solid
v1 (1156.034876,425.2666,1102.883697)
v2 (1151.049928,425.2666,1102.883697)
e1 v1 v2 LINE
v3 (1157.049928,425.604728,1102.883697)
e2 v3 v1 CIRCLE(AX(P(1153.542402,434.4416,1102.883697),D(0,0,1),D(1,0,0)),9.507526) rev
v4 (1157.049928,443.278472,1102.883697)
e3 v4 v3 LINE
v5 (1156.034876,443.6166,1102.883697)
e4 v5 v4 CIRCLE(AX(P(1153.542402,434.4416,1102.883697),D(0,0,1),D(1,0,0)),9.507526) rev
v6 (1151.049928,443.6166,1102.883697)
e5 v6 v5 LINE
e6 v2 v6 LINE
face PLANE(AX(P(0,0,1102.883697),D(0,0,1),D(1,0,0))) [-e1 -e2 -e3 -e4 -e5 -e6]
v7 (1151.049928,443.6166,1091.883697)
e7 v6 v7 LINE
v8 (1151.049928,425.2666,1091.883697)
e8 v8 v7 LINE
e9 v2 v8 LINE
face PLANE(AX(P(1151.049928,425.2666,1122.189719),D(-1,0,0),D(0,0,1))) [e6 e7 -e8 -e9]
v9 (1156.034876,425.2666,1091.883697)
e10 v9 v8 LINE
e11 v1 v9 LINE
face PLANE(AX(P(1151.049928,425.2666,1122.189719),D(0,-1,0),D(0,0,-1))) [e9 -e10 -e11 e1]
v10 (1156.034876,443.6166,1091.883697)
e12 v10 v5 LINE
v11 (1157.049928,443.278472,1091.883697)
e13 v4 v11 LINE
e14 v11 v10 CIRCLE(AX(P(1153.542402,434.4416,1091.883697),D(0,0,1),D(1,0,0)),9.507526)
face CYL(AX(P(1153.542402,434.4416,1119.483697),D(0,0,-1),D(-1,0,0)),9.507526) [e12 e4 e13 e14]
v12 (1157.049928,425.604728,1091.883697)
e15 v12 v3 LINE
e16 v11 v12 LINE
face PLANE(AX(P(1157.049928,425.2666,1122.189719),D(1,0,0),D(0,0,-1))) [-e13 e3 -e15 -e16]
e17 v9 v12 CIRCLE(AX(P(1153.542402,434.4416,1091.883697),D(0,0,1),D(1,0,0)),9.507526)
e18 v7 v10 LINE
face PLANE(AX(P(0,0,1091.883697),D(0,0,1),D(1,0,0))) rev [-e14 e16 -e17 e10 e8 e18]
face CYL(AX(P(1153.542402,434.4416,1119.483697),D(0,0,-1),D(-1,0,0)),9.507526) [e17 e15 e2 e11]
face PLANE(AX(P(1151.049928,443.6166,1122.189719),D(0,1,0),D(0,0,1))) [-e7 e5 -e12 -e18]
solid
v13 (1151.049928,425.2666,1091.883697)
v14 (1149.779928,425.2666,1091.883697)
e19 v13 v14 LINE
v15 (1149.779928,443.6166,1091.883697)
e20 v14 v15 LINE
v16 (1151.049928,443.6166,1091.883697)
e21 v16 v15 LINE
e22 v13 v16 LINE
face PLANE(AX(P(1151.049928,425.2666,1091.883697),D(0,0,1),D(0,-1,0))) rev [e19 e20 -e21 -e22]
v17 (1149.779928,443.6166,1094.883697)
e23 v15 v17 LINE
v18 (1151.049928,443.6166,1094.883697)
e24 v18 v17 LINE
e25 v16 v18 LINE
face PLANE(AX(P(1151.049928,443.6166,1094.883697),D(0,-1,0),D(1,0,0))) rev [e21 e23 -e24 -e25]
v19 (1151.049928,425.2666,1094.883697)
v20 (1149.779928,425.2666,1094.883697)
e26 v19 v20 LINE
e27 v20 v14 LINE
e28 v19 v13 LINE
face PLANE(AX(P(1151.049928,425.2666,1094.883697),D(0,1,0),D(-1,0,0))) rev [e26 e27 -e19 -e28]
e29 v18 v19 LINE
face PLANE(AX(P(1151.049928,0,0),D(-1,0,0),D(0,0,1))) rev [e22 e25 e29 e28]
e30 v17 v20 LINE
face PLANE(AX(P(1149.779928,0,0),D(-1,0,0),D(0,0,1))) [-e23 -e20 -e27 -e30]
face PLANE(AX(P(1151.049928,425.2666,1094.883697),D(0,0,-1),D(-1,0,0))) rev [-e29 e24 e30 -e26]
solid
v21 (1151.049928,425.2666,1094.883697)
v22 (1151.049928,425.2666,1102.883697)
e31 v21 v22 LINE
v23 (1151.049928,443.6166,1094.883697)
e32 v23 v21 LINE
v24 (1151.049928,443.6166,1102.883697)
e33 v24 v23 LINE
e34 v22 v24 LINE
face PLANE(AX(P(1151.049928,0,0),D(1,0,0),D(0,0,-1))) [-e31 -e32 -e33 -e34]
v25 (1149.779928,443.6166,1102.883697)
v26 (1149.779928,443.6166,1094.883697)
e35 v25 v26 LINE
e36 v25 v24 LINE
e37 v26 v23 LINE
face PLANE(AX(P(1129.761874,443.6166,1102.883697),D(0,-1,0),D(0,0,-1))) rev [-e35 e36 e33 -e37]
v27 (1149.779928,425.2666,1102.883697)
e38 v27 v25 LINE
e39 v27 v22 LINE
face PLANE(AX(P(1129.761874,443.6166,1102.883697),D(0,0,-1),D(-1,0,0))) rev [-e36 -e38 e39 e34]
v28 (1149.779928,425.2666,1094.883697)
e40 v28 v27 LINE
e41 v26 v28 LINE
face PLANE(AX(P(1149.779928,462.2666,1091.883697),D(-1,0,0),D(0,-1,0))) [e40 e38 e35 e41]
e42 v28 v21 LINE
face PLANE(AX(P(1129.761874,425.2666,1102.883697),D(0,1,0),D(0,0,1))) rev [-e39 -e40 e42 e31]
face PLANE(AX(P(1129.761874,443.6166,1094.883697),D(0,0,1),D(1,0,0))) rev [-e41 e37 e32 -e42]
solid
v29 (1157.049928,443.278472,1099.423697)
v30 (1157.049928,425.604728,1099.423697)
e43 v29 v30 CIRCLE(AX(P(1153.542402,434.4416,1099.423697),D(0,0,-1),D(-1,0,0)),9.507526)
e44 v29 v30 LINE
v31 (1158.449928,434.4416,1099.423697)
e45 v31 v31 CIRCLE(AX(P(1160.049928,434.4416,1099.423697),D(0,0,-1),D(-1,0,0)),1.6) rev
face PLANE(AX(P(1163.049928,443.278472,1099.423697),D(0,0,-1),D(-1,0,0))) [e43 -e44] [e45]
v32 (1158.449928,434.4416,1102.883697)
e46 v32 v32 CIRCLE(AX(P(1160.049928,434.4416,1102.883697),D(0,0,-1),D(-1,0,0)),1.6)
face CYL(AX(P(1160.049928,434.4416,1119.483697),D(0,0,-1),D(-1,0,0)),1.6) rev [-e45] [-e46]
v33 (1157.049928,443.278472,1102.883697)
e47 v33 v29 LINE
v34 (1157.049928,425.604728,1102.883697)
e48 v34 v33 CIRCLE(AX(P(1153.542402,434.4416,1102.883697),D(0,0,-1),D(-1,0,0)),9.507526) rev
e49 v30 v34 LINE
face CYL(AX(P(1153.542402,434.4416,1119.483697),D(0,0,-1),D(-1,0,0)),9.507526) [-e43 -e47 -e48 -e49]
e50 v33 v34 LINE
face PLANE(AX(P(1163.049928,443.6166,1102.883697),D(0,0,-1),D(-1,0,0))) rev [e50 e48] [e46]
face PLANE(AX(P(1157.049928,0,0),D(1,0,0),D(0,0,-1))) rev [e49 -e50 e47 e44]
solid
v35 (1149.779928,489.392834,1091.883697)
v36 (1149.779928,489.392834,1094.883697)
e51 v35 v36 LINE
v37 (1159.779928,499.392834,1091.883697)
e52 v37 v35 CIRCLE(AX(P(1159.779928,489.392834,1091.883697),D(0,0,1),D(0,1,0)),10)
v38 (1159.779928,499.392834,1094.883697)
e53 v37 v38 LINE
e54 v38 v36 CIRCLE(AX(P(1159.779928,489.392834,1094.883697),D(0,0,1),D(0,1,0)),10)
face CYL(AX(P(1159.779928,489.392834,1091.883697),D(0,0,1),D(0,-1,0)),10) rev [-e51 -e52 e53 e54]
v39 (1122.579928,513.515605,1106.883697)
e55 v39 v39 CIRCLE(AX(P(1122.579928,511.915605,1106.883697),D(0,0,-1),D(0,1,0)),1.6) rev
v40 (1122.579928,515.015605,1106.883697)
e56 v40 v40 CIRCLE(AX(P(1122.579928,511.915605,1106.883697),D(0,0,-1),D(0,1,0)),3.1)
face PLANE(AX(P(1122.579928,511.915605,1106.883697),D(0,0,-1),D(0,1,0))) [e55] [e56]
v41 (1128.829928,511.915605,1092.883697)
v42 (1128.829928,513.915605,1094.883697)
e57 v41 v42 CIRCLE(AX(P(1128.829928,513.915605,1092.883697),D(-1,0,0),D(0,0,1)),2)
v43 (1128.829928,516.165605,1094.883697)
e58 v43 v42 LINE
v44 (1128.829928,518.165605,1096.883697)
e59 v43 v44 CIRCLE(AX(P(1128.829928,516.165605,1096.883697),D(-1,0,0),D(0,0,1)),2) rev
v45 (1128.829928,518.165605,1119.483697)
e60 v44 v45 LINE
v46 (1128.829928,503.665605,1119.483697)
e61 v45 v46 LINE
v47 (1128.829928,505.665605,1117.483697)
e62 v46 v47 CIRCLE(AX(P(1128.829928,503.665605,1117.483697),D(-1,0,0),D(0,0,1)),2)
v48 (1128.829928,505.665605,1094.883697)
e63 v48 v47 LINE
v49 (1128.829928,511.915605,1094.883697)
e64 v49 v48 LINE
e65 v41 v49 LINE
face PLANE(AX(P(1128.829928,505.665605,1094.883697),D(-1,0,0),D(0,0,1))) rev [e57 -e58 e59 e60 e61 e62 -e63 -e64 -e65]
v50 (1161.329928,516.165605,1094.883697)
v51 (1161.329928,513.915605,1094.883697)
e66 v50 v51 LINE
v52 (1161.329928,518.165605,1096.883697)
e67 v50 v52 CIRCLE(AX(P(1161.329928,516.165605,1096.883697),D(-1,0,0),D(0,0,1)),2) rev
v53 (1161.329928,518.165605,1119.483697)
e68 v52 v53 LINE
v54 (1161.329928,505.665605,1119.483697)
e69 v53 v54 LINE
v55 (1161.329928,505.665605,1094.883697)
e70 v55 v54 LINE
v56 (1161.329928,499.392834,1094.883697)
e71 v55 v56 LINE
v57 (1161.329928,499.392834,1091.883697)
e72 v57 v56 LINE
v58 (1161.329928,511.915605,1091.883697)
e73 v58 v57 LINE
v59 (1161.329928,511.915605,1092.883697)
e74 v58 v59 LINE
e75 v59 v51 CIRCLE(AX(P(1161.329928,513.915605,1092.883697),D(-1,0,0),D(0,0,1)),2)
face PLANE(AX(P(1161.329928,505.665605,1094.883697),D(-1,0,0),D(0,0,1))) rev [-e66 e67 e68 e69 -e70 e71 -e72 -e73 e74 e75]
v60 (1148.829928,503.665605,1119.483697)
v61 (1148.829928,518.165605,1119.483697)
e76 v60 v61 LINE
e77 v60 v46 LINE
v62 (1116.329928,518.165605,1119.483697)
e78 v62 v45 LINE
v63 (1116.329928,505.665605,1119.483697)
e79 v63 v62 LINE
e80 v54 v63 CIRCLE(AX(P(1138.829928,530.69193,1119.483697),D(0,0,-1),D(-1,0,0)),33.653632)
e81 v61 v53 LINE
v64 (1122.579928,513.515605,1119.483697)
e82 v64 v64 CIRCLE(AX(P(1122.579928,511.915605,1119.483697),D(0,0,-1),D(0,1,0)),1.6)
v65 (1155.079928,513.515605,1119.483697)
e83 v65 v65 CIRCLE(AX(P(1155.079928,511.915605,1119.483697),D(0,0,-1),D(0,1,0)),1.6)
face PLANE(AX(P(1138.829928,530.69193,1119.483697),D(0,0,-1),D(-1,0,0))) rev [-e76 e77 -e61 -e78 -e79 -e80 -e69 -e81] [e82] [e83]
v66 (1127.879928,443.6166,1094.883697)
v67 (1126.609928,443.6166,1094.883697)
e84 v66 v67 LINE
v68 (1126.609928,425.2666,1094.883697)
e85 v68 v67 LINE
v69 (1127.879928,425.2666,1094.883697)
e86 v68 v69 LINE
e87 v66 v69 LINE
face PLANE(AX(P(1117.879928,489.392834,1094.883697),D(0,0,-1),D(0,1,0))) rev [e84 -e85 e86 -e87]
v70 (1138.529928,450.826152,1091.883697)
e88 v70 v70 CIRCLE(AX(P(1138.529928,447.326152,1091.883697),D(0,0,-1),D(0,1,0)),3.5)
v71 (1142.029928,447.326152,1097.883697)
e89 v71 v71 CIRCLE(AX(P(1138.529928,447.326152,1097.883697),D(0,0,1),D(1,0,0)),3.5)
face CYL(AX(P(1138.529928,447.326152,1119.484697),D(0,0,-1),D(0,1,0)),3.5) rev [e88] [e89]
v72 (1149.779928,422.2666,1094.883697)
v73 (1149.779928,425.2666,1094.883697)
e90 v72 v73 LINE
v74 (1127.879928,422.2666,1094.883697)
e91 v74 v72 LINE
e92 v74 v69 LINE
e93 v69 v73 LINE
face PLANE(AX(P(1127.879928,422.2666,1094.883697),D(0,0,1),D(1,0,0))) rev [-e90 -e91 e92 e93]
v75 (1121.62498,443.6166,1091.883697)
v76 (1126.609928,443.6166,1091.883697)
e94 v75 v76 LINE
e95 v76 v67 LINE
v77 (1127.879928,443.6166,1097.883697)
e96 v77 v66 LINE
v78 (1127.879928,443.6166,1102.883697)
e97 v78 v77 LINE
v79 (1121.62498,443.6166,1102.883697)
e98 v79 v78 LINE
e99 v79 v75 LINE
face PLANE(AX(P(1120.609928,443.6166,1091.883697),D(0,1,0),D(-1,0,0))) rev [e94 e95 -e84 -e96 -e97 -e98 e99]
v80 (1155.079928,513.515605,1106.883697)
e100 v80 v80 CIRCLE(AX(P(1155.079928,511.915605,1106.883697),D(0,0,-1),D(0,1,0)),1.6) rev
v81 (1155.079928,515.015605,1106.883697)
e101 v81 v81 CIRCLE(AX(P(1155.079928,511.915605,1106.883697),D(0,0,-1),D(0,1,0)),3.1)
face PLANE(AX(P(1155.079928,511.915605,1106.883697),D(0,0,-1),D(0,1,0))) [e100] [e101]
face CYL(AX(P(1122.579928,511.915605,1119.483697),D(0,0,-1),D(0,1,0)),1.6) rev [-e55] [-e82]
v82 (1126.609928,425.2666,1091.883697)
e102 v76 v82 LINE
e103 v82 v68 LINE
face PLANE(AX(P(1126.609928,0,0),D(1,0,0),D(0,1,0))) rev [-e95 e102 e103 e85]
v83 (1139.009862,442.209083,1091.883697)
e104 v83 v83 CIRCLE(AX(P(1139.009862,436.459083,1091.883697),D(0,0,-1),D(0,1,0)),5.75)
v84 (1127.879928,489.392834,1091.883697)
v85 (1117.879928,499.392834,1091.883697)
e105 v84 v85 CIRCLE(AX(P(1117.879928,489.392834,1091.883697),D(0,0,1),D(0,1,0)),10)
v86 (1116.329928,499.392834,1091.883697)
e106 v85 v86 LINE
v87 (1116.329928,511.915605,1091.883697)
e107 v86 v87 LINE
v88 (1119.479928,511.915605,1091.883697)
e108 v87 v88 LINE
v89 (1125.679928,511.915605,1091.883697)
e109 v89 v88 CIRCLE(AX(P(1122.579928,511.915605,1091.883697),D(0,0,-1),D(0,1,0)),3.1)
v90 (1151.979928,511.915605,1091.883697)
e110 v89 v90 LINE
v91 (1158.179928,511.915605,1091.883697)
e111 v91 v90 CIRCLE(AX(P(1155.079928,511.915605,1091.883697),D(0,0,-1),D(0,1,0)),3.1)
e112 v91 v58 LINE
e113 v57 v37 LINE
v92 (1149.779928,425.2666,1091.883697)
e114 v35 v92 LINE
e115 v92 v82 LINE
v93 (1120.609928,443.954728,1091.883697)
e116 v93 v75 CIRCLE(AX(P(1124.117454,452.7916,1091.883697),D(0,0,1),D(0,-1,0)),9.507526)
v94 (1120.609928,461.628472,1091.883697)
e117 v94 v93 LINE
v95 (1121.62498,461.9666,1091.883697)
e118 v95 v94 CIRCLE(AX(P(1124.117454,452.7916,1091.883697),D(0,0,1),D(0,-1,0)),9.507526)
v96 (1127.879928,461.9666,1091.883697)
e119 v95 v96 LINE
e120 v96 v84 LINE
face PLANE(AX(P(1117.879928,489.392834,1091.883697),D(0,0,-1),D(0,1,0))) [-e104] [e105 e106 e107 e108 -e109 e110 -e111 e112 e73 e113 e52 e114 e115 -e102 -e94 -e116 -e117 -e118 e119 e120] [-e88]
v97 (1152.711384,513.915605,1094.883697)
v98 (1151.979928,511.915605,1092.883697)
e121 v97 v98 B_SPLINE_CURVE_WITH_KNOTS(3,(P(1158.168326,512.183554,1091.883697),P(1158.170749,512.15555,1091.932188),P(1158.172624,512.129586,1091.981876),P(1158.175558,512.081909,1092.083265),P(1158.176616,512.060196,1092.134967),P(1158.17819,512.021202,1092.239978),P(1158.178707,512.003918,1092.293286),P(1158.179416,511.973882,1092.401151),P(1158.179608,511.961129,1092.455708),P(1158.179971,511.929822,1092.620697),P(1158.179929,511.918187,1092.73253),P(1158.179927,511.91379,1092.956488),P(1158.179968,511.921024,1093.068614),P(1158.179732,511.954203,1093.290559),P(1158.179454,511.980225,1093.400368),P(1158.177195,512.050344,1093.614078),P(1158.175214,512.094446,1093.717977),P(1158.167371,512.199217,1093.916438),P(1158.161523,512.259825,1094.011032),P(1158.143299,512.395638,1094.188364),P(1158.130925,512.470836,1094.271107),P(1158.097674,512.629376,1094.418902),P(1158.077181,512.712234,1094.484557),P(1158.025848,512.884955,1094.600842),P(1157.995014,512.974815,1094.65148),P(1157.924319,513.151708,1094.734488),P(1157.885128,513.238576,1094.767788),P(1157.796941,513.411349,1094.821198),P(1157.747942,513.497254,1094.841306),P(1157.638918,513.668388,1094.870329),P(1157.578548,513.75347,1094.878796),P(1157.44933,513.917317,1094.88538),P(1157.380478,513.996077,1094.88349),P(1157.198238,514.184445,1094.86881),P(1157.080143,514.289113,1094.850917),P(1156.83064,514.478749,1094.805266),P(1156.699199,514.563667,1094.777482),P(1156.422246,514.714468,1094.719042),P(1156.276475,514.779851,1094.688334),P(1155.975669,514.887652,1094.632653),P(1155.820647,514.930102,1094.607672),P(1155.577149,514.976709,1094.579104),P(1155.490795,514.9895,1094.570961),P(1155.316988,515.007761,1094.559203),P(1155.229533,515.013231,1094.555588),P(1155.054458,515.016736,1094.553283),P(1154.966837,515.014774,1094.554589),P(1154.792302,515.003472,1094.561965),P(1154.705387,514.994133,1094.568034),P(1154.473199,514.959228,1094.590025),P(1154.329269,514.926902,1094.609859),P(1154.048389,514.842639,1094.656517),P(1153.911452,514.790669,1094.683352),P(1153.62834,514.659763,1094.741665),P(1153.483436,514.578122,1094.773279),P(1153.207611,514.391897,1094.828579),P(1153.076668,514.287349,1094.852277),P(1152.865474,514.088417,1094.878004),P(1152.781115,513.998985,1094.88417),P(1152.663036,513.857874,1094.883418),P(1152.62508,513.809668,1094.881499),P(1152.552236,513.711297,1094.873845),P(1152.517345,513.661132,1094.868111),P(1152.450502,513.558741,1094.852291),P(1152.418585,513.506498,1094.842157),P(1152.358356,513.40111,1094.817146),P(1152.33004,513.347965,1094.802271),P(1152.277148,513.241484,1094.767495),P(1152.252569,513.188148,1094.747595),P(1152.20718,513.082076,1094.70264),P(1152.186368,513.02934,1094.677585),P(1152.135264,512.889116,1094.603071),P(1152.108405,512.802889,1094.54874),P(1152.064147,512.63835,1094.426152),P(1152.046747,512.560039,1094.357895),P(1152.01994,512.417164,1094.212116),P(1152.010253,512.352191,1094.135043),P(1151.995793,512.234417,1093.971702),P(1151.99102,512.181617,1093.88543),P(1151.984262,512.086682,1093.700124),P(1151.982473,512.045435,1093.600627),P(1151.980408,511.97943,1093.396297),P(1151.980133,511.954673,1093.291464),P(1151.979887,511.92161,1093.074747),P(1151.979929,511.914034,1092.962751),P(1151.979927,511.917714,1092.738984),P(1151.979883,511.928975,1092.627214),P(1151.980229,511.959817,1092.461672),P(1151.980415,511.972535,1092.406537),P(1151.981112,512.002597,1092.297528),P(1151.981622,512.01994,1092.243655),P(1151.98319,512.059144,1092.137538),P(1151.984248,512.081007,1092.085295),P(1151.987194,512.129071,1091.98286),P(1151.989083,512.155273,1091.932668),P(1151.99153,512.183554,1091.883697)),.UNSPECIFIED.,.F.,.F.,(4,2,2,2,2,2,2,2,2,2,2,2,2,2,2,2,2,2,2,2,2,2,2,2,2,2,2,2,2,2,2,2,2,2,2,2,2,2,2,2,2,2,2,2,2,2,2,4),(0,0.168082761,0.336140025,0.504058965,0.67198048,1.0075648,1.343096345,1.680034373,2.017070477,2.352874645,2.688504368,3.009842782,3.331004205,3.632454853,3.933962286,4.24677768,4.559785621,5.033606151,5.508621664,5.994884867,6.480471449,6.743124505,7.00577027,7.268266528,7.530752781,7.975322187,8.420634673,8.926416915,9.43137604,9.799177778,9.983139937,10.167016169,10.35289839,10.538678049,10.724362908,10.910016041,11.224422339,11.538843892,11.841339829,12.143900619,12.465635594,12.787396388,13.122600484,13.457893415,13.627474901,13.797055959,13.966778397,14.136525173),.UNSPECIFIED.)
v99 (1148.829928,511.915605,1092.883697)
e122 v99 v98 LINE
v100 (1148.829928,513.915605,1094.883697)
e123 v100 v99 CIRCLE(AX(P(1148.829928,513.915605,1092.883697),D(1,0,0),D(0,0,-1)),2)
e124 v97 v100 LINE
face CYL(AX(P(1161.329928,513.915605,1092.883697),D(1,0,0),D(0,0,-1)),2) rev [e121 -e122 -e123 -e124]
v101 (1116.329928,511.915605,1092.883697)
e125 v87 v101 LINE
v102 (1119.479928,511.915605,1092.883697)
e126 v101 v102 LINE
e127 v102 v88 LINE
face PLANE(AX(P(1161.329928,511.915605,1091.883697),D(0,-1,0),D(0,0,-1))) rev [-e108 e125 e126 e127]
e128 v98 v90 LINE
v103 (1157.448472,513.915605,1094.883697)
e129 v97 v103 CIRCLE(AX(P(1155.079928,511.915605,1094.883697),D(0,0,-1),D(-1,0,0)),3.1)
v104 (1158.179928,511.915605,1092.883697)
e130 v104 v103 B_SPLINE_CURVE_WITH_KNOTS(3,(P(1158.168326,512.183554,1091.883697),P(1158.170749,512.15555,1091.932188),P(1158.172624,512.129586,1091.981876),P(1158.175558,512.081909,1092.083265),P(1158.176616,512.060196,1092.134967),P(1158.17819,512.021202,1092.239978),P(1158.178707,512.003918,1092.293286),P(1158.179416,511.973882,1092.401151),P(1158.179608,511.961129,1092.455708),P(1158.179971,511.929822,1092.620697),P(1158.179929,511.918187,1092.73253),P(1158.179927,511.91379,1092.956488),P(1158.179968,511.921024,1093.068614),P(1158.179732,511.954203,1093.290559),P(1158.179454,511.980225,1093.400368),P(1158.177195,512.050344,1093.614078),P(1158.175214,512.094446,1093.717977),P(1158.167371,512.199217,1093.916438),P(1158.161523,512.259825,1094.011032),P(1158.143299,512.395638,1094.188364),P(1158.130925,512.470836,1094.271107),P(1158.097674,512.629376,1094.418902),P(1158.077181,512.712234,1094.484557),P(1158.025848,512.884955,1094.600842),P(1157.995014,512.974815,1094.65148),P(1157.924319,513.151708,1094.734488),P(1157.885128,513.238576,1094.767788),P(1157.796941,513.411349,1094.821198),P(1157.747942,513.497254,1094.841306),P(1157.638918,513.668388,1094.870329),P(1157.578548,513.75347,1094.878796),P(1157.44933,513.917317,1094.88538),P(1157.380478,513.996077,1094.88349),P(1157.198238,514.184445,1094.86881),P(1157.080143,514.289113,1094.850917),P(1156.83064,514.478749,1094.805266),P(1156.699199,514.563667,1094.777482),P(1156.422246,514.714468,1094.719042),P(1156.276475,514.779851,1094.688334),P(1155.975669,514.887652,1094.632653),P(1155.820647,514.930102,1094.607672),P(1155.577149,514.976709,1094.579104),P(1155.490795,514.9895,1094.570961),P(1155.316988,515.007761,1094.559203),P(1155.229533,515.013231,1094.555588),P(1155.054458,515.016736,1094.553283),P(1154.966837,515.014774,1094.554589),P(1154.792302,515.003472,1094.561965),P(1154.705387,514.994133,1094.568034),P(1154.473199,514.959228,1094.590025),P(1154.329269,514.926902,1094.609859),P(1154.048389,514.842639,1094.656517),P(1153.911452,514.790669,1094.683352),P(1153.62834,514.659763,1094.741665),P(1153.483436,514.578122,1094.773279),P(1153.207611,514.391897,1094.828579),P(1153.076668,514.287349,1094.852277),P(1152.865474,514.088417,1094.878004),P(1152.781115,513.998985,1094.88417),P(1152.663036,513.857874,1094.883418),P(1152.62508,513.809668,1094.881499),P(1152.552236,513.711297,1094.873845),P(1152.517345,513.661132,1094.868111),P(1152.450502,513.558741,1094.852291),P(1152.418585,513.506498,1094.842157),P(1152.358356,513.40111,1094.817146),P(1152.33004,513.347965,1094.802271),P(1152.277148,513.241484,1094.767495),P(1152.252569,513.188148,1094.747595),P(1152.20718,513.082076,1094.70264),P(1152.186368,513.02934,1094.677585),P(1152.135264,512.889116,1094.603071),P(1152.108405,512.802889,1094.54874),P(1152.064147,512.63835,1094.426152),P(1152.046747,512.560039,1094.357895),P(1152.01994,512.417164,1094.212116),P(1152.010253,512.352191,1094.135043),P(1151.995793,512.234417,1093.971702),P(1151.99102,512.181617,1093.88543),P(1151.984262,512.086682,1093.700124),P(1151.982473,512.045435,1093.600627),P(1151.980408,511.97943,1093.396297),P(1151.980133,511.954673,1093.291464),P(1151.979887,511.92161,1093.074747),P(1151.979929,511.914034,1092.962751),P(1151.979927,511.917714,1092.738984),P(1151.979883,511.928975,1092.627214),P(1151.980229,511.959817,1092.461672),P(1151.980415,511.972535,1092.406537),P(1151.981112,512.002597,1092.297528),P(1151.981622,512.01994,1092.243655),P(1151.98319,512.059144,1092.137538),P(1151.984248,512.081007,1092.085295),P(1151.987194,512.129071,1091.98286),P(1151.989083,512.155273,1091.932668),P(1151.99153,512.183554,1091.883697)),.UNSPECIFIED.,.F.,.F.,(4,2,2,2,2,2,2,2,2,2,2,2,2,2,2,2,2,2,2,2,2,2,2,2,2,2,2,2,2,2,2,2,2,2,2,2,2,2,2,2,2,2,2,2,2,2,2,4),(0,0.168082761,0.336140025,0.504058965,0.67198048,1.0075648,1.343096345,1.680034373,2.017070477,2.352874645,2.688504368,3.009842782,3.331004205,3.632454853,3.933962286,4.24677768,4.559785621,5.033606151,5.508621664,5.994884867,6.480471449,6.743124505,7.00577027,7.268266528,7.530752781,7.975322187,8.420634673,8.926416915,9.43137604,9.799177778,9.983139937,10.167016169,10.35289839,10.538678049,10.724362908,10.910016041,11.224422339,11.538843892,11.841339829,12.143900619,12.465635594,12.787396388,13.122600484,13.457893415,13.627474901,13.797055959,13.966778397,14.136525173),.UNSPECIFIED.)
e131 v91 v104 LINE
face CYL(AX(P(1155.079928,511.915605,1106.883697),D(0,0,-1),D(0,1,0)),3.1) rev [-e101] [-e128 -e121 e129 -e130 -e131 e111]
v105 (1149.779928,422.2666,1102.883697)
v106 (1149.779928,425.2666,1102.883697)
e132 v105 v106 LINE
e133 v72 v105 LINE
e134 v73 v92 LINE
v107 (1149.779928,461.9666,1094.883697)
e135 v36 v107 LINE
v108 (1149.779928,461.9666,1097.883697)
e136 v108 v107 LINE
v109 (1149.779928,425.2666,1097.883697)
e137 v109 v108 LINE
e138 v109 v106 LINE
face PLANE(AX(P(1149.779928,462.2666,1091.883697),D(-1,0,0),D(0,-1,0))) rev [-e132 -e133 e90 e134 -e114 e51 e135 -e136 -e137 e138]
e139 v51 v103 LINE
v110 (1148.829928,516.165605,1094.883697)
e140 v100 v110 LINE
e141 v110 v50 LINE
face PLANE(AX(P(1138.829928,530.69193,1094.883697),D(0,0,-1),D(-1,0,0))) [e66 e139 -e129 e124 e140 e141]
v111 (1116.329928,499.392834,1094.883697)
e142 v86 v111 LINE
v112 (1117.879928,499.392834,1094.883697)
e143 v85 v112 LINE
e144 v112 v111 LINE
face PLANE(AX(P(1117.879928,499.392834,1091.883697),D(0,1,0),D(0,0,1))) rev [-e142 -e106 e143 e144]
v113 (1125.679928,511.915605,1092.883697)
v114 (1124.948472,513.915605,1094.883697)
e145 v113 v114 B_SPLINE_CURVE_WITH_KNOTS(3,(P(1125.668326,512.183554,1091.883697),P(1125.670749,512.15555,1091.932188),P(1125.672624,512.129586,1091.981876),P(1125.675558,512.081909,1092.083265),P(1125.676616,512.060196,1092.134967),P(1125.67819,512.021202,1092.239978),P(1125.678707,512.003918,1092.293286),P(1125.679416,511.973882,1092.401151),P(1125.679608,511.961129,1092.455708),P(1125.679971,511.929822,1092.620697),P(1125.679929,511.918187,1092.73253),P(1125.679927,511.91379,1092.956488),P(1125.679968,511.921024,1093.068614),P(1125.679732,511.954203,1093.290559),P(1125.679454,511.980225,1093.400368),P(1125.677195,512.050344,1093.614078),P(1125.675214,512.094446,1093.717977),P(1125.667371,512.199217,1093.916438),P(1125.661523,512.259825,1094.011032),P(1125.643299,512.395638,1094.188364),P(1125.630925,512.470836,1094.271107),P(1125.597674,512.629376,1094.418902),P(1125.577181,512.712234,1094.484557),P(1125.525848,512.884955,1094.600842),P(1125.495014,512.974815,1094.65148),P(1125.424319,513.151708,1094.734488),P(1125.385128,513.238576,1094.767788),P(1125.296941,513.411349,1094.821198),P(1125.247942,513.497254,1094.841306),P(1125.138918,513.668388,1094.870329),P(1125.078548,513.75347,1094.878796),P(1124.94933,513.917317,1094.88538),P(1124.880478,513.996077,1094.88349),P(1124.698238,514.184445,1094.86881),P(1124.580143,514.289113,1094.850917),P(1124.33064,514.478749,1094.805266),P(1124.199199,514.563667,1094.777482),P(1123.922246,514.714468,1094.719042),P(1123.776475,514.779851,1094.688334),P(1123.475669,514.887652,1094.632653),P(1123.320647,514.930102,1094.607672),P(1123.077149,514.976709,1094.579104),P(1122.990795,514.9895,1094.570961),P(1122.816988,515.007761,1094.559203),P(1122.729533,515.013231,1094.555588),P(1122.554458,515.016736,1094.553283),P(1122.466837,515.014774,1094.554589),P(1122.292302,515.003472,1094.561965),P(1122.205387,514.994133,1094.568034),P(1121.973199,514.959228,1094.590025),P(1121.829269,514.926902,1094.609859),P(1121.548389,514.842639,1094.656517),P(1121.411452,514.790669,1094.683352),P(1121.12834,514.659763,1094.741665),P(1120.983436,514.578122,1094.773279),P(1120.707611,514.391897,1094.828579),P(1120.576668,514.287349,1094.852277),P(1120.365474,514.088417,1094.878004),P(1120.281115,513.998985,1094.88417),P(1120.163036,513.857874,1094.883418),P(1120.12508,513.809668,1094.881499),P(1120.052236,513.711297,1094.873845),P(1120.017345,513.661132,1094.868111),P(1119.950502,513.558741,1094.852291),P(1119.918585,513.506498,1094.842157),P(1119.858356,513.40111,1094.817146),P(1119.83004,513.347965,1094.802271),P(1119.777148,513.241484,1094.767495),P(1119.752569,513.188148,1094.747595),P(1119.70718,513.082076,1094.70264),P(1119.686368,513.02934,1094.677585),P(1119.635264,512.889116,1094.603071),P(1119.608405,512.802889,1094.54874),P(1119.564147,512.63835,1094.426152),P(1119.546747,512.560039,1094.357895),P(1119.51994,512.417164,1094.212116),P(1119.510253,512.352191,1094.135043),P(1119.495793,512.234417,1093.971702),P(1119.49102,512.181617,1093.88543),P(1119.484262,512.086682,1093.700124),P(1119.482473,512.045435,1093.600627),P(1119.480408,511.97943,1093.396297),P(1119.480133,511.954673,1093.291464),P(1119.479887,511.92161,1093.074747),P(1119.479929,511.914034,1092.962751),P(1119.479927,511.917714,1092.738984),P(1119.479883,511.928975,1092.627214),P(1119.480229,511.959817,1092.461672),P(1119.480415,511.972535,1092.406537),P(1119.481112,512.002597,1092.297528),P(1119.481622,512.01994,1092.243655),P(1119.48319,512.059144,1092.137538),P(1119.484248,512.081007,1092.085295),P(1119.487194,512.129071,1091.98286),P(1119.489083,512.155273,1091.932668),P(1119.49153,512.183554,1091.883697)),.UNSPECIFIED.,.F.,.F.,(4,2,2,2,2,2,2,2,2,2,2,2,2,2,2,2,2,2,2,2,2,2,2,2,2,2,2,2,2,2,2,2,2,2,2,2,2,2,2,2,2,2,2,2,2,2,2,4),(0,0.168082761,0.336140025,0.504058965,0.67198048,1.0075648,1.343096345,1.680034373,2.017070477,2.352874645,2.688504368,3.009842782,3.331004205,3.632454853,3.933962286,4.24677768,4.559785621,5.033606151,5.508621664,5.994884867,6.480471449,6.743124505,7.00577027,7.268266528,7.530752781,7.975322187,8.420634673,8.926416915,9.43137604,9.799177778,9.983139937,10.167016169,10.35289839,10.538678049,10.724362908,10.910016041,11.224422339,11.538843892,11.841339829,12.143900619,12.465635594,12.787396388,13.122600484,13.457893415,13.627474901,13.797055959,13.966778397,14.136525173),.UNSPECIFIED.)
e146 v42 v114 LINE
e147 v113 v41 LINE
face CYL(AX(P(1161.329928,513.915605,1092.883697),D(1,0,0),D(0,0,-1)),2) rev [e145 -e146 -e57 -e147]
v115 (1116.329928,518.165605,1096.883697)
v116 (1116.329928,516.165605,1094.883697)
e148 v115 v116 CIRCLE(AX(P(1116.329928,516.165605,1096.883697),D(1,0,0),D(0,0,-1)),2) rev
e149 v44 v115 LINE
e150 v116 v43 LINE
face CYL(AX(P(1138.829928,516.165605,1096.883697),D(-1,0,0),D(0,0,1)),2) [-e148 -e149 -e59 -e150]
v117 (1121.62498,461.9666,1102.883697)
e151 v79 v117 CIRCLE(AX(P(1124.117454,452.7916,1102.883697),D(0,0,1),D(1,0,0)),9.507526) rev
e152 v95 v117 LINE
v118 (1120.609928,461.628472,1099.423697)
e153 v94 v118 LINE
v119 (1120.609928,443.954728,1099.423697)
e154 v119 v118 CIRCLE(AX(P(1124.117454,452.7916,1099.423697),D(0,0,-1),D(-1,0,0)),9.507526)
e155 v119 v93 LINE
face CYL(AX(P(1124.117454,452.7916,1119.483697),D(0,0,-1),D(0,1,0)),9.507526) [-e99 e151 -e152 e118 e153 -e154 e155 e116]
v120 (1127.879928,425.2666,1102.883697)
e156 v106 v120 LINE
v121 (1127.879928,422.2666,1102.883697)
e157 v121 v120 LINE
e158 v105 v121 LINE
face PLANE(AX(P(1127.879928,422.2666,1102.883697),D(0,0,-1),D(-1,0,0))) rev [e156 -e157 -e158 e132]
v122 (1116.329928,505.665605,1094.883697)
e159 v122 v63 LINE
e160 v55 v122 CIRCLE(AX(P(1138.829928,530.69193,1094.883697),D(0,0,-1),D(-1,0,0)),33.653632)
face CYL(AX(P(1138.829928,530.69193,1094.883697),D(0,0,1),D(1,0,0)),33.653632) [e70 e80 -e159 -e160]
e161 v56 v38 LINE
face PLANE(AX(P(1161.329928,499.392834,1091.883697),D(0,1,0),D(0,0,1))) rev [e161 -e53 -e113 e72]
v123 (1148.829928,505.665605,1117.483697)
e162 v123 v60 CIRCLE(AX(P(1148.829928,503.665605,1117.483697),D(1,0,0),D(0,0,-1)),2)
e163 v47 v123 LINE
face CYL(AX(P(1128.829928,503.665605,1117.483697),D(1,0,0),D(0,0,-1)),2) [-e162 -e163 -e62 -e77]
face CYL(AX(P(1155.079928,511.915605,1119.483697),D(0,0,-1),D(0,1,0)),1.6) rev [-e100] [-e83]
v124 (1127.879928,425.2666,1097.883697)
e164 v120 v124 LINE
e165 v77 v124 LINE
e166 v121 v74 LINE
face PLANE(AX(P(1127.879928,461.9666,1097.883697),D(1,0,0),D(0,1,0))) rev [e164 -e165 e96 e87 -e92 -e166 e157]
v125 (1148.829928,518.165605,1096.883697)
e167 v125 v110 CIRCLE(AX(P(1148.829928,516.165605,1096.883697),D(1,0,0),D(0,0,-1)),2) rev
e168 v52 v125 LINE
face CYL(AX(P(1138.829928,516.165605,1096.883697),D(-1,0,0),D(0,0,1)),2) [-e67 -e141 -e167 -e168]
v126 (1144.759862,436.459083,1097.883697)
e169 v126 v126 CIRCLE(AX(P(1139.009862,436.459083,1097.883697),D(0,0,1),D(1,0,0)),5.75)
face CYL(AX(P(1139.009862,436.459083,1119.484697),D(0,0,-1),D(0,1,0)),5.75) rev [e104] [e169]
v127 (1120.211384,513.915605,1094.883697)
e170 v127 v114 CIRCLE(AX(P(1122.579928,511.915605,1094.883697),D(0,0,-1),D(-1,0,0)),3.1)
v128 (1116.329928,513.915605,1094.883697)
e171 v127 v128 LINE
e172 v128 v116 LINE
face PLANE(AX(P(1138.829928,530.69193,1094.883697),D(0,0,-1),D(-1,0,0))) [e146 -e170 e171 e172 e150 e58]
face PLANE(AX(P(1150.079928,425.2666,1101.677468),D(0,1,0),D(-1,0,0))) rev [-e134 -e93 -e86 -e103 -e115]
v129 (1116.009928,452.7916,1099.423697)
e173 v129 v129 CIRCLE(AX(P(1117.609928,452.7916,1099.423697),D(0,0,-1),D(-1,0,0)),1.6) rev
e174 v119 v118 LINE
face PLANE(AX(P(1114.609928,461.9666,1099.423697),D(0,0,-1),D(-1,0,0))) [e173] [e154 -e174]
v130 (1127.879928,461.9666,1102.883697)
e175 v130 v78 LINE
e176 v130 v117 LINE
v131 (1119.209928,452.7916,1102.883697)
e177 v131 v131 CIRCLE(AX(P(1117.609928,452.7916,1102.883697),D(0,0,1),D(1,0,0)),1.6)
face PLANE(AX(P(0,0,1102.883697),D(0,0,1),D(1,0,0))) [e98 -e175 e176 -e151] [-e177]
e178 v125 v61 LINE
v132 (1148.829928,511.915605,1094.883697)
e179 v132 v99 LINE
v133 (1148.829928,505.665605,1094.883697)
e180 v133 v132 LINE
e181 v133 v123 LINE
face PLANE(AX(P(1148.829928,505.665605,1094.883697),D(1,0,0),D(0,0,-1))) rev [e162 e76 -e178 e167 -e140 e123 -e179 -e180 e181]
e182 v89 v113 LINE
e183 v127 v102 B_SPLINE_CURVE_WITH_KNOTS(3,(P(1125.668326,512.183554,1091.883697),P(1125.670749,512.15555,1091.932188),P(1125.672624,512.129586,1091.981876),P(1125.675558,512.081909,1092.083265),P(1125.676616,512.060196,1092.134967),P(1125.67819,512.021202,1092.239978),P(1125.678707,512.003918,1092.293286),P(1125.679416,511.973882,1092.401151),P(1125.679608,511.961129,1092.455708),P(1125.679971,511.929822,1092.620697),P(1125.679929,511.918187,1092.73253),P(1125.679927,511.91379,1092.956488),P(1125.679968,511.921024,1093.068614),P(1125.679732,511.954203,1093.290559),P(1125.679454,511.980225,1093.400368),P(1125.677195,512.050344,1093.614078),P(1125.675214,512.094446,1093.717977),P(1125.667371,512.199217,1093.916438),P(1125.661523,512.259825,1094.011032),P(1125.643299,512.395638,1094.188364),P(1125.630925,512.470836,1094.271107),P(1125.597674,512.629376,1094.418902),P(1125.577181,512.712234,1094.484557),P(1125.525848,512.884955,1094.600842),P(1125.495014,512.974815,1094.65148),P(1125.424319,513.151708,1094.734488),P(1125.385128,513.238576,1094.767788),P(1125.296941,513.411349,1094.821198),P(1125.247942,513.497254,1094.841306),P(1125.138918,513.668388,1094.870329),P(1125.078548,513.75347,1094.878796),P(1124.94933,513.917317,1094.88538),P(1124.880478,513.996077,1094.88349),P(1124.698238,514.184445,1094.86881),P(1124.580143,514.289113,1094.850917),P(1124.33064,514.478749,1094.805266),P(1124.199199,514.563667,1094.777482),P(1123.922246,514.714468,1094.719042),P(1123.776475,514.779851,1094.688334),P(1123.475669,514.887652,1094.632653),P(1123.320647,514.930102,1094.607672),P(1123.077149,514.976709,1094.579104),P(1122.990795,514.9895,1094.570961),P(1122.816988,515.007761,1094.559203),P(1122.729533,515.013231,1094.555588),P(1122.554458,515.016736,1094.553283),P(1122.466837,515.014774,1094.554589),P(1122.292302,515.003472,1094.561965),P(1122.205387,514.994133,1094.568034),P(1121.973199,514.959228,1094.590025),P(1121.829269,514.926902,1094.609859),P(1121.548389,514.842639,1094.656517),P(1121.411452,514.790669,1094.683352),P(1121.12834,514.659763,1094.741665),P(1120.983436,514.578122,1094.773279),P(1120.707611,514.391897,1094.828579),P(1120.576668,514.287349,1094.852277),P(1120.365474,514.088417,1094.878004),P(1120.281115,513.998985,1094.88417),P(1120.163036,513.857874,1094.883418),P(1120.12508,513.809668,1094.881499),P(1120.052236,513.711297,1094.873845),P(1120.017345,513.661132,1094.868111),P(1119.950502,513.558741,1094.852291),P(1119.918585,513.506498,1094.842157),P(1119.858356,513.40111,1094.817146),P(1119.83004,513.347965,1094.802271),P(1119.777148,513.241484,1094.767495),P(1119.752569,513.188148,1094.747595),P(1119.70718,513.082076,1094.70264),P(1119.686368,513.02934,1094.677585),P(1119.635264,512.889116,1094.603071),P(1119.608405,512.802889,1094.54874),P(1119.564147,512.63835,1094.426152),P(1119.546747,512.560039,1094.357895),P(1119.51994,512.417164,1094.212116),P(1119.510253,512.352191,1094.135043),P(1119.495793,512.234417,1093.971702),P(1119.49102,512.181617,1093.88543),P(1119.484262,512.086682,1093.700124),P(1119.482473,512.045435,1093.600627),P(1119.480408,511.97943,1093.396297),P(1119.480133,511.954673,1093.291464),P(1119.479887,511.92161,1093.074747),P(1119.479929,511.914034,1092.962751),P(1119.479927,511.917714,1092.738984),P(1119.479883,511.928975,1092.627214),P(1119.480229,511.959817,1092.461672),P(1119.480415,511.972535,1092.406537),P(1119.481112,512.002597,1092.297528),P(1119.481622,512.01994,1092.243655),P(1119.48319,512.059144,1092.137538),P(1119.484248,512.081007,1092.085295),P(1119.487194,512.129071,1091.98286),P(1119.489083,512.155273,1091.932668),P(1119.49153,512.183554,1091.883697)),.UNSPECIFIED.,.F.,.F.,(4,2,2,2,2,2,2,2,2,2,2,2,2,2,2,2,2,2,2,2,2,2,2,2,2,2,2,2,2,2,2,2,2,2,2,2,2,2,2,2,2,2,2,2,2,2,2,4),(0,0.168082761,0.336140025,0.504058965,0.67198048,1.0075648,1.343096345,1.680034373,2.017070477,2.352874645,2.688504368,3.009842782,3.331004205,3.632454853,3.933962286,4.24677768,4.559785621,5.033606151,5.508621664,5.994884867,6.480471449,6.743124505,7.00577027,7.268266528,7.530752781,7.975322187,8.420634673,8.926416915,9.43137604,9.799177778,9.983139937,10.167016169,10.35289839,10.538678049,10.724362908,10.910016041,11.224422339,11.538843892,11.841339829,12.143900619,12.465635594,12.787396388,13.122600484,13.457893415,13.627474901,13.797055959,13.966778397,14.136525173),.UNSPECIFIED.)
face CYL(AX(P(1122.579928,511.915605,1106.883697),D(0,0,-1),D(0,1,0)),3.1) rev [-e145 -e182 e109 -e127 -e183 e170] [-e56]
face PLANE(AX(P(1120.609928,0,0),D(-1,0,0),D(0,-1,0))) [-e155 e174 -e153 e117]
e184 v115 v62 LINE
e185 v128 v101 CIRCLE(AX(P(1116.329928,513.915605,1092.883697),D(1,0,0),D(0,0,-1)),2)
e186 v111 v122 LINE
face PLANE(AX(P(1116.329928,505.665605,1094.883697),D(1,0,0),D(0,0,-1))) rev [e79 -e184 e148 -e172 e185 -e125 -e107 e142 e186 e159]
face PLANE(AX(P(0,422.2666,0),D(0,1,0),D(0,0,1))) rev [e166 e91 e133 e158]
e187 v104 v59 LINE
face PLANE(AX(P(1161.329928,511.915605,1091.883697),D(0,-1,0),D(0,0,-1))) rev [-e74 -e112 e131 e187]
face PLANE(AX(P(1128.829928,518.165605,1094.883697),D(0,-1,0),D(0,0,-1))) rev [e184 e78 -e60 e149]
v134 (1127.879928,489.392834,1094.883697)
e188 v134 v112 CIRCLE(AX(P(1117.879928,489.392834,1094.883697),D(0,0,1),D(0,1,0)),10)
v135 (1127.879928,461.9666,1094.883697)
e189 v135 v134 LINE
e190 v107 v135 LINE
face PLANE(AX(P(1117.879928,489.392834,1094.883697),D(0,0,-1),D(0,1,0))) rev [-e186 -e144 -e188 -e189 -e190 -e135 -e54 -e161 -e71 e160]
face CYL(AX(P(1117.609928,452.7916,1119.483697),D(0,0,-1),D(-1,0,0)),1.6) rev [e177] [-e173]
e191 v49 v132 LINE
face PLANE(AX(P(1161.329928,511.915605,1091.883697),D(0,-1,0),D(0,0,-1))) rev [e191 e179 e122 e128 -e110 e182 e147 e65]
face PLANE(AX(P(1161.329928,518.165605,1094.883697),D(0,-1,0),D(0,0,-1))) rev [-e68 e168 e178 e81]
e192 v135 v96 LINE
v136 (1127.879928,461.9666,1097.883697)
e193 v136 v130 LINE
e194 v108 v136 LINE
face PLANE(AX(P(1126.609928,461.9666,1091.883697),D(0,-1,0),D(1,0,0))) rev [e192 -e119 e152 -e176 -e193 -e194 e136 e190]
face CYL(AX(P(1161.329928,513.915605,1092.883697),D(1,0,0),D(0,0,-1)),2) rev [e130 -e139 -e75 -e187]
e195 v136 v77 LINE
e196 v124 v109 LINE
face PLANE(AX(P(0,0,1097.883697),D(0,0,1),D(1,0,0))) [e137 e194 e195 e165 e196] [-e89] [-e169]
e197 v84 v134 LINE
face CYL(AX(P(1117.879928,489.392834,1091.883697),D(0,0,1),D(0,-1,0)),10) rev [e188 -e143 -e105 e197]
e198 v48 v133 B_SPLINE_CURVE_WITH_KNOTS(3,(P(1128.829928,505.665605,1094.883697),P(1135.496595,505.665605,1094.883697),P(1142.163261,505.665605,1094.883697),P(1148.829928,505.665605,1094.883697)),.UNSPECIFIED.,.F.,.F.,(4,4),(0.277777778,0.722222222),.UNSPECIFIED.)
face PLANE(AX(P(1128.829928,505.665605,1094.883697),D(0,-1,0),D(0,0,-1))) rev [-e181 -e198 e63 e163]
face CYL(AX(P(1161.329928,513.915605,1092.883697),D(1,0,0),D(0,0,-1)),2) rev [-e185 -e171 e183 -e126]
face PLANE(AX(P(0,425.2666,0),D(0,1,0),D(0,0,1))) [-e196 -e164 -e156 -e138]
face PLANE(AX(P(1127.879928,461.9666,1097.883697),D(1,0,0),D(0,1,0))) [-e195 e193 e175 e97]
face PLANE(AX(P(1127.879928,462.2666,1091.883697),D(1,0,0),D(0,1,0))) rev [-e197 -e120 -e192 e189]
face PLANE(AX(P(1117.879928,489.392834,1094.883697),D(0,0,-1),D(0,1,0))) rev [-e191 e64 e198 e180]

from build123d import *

# Parameters (mm, degrees)
BOSS_EXTRUDE1_DEPTH     = 24.6
BOSS_EXTRUDE2_DEPTH     = 3
SKETCH5_W               = 21.9
SKETCH5_H               = 3
BOSS_EXTRUDE3_DEPTH     = 37
CUT_EXTRUDE1_REACH      = 1273.984
SKETCH7_R               = 5.75
SKETCH8_W               = 3
SKETCH8_H               = 36.7
BOSS_EXTRUDE4_DEPTH     = 1.27
SKETCH9_W               = 3
SKETCH9_H               = 18.35
BOSS_EXTRUDE5_DEPTH     = 6
SKETCH11_W              = 6
SKETCH11_H              = 18.35
BOSS_EXTRUDE6_DEPTH     = 8
SKETCH12_W              = 6
SKETCH12_H              = 18.35
BOSS_EXTRUDE7_DEPTH     = 6
SKETCH14_R              = 1.6
CUT_EXTRUDE2_DEPTH      = 1272.885826469
CUT_EXTRUDE3_DEPTH      = 1272.984495021
SKETCH17_R              = 1.6
CUT_EXTRUDE4_DEPTH      = 1272.984495021
FILLET5_R               = 2
SKETCH18_R              = 3.1
CUT_EXTRUDE5_DEPTH      = 15
FILLET8_R               = 2
SKETCH19_W              = 3
SKETCH19_H              = 18.35
BOSS_EXTRUDE9_DEPTH     = 1.27
SKETCH20_W              = 6
SKETCH20_H              = 18.35
BOSS_EXTRUDE10_DEPTH    = 11
SKETCH21_W              = 6
SKETCH21_H              = 18.35
BOSS_EXTRUDE12_DEPTH    = 6
SKETCH22_R              = 1.6
CUT_EXTRUDE6_DEPTH      = 1274.45651229
CUT_EXTRUDE7_DEPTH      = 1274.45651229
CUT_EXTRUDE7_DEPTH_BACK = 1274.45651229
SKETCH24_R              = 3.5
CUT_EXTRUDE9_DEPTH      = 3
SKETCH25_W              = 21.9
SKETCH25_H              = 36.7
SKETCH25_R              = 5.75
SKETCH25_R_2            = 3.5
BOSS_EXTRUDE13_DEPTH    = 3
SKETCH26_W              = 21.9
SKETCH26_H              = 8
BOSS_EXTRUDE14_DEPTH    = 3
SKETCH27_W              = 8
SKETCH27_H              = 18.35
BOSS_EXTRUDE15_DEPTH    = 1.27
SKETCH28_W              = 8
SKETCH28_H              = 18.35
BOSS_EXTRUDE17_DEPTH    = 1.27
SKETCH31_W              = 2.54
SKETCH31_H              = 17.673744651
CUT_EXTRUDE16_DEPTH     = 1235.317826103
SKETCH32_W              = 7.54
SKETCH32_H              = 18.35
CUT_EXTRUDE17_DEPTH     = 1235.317826103


with BuildPart() as part:
    # Sketch1 → Boss-Extrude1 (new body)
    with BuildSketch(Plane(origin=(0, 0, 1119.483697074), x_dir=(-1, 0, 0), z_dir=(0, 0, -1))):
        with BuildLine():
            Line((-1161.329927858, 505.6656047), (-1161.329927858, 518.1656047))
            Line((-1161.329927858, 518.1656047), (-1148.829927858, 518.1656047))
            Line((-1148.829927858, 518.1656047), (-1148.829927858, 505.6656047))
            add(Edge.make_bspline(
                [(-1148.829927858, 505.6656047), (-1142.163261192, 505.6656047), (-1135.496594525, 505.6656047), (-1128.829927858, 505.6656047)],
                knots=[0.277777778, 0.277777778, 0.277777778, 0.277777778, 0.722222222, 0.722222222, 0.722222222, 0.722222222], degree=3))
            Line((-1128.829927858, 505.6656047), (-1128.829927858, 518.1656047))
            Line((-1128.829927858, 518.1656047), (-1116.329927858, 518.1656047))
            Line((-1116.329927858, 518.1656047), (-1116.329927858, 505.6656047))
            ThreePointArc((-1116.329927858, 505.6656047), (-1138.829927858, 497.038297899), (-1161.329927858, 505.6656047))
        make_face()
    extrude(amount=BOSS_EXTRUDE1_DEPTH)

    # Sketch4 → Boss-Extrude2 (add)
    with BuildSketch(Plane(origin=(0, 0, 1094.883697074), x_dir=(-1, 0, 0), z_dir=(0, 0, -1))):
        with BuildLine():
            Line((-1149.779927858, 462.266600027), (-1149.779927858, 489.392833753))
            ThreePointArc((-1149.779927858, 489.392833753), (-1152.708860047, 496.463901565), (-1159.779927858, 499.392833753))
            Line((-1159.779927858, 499.392833753), (-1161.329927858, 499.392833753))
            Line((-1161.329927858, 499.392833753), (-1161.329927858, 511.9156047))
            Line((-1161.329927858, 511.9156047), (-1116.329927858, 511.9156047))
            Line((-1116.329927858, 511.9156047), (-1116.329927858, 499.392833753))
            Line((-1116.329927858, 499.392833753), (-1117.879927858, 499.392833753))
            ThreePointArc((-1117.879927858, 499.392833753), (-1124.95099567, 496.463901565), (-1127.879927858, 489.392833753))
            Line((-1127.879927858, 489.392833753), (-1127.879927858, 462.266600027))
            Line((-1127.879927858, 462.266600027), (-1149.779927858, 462.266600027))
        make_face()
    extrude(amount=BOSS_EXTRUDE2_DEPTH)

    # Sketch5 → Boss-Extrude3 (add)
    with BuildSketch(Plane.XZ.offset(-462.266600027)):
        with Locations((1138.829927858, 1093.383697074)):
            Rectangle(SKETCH5_W, SKETCH5_H)
    extrude(amount=BOSS_EXTRUDE3_DEPTH)

    # Sketch7 → Cut-Extrude1 (cut, up to next)
    with BuildSketch(Plane(origin=(0, 0, 1091.883697074), x_dir=(-1, 0, 0), z_dir=(0, 0, -1)), mode=Mode.PRIVATE) as cut_extrude1_sk1:
        with Locations(Location((-1139.009861583, 436.459083358, 0), (0, 0, 90))):
            Circle(SKETCH7_R)
    cut_extrude1_tool1 = extrude(cut_extrude1_sk1.sketch, amount=-CUT_EXTRUDE1_REACH, mode=Mode.PRIVATE) & part.part
    add(cut_extrude1_tool1.solids().sort_by_distance((1139.009862, 436.459083, 1091.883697))[0], mode=Mode.SUBTRACT)



with BuildPart() as body_2:
    # Sketch8 → Boss-Extrude4 (new body)
    with BuildSketch(Plane.ZY.offset(-1127.879927858)):
        with Locations((1093.383697074, 443.616600027)):
            Rectangle(SKETCH8_W, SKETCH8_H)
    extrude(amount=BOSS_EXTRUDE4_DEPTH)


with BuildPart() as part_1:
    add(part.part)

    add(body_2.part)  # Boss-Extrude5 merges body 2
    # Sketch9 → Boss-Extrude5 (add)
    with BuildSketch(Plane.ZY.offset(-1126.609927858)):
        with Locations((1093.383697074, 452.791600027)):
            Rectangle(SKETCH9_W, SKETCH9_H)
    extrude(amount=BOSS_EXTRUDE5_DEPTH)

    # Sketch11 → Boss-Extrude6 (add)
    with BuildSketch(Plane.XY.offset(1094.883697074)):
        with Locations((1123.609927858, 452.791600027)):
            Rectangle(SKETCH11_W, SKETCH11_H)
    extrude(amount=BOSS_EXTRUDE6_DEPTH)

    # Sketch12 → Boss-Extrude7 (add)
    with BuildSketch(Plane.ZY.offset(-1120.609927858)):
        with Locations((1099.883697074, 452.791600027)):
            Rectangle(SKETCH12_W, SKETCH12_H)
    extrude(amount=BOSS_EXTRUDE7_DEPTH)

    # Sketch14 → Cut-Extrude2 (cut, through all)
    with BuildSketch(Plane(origin=(0, 0, 1096.883697074), x_dir=(-1, 0, 0), z_dir=(0, 0, -1))):
        with Locations((-1117.609927858, 452.791600027)):
            Circle(SKETCH14_R)
    extrude(amount=-CUT_EXTRUDE2_DEPTH, mode=Mode.SUBTRACT)

    # Sketch16 → Cut-Extrude3 (cut, through all)
    with BuildSketch(Plane(origin=(0, 0, 1091.883697074), x_dir=(-1, 0, 0), z_dir=(0, 0, -1))):
        with BuildLine():
            Line((-1126.609927858, 461.966600027), (-1126.609927858, 463.878724732))
            Line((-1126.609927858, 463.878724732), (-1111.609927858, 463.878724732))
            Line((-1111.609927858, 463.878724732), (-1111.609927858, 441.878724732))
            Line((-1111.609927858, 441.878724732), (-1126.609927858, 441.878724732))
            Line((-1126.609927858, 441.878724732), (-1126.609927858, 443.616600027))
            ThreePointArc((-1126.609927858, 443.616600027), (-1114.609927858, 452.791600027), (-1126.609927858, 461.966600027))
        make_face()
    extrude(amount=-CUT_EXTRUDE3_DEPTH, mode=Mode.SUBTRACT)

    # Sketch17 → Cut-Extrude4 (cut, through all)
    with BuildSketch(Plane(origin=(0, 0, 1091.883697074), x_dir=(-1, 0, 0), z_dir=(0, 0, -1))):
        with Locations(Location((-1122.579927858, 511.9156047, 0), (0, 0, 90))):
            Circle(SKETCH17_R)
        with Locations(Location((-1155.079927858, 511.9156047, 0), (0, 0, 90))):
            Circle(SKETCH17_R)
    extrude(amount=-CUT_EXTRUDE4_DEPTH, mode=Mode.SUBTRACT)

    # Fillet5
    # the kernel refuses this fillet: 2 mm, written as the material it adds along each edge
    with BuildSketch(Plane(origin=(1128.829927858, 511.9156047, 1094.883697074), x_dir=(0, 0, -1), z_dir=(-1, 0, 0))) as fillet5_piece_1_section:
        with BuildLine():
            CenterArc((FILLET5_R, -FILLET5_R), FILLET5_R, 90, 90)
            Line((0, -FILLET5_R), (0, 0))
            Line((0, 0), (FILLET5_R, 0))
        make_face()
    fillet5_piece_1 = extrude(amount=9.65, mode=Mode.PRIVATE)
    fillet5_piece_1 = fillet5_piece_1 - Plane(origin=(1122.579927858, 511.9156047, 1094.447824363), x_dir=(0, 1, 0), z_dir=(0, 0, -1)) * Cylinder(1.6, 28, mode=Mode.PRIVATE)
    add(fillet5_piece_1)
    with BuildSketch(Plane(origin=(1161.329927858, 511.9156047, 1094.883697074), x_dir=(0, 0, -1), z_dir=(-1, 0, 0))) as fillet5_piece_2_section:
        with BuildLine():
            CenterArc((FILLET5_R, -FILLET5_R), FILLET5_R, 90, 90)
            Line((0, -FILLET5_R), (0, 0))
            Line((0, 0), (FILLET5_R, 0))
        make_face()
    fillet5_piece_2 = extrude(amount=9.65, mode=Mode.PRIVATE)
    fillet5_piece_2 = fillet5_piece_2 - Plane(origin=(1155.079927858, 511.9156047, 1094.447824363), x_dir=(0, 1, 0), z_dir=(0, 0, -1)) * Cylinder(1.6, 28, mode=Mode.PRIVATE)
    add(fillet5_piece_2)
    with BuildSketch(Plane(origin=(1158.479927859, 511.9156047, 1094.883697074), x_dir=(0, 0, -1), z_dir=(-1, 0, 0))) as fillet5_piece_3_section:
        with BuildLine():
            CenterArc((FILLET5_R, -FILLET5_R), FILLET5_R, 90, 90)
            Line((0, -FILLET5_R), (0, 0))
            Line((0, 0), (FILLET5_R, 0))
        make_face()
    fillet5_piece_3 = extrude(amount=9.65, mode=Mode.PRIVATE)
    fillet5_piece_3 = fillet5_piece_3 - Plane(origin=(1155.079927858, 511.9156047, 1094.447824598), x_dir=(0, 1, 0), z_dir=(0, 0, -1)) * Cylinder(1.6, 28, mode=Mode.PRIVATE)
    add(fillet5_piece_3)
    with BuildSketch(Plane(origin=(1125.979927859, 511.9156047, 1094.883697074), x_dir=(0, 0, -1), z_dir=(-1, 0, 0))) as fillet5_piece_4_section:
        with BuildLine():
            CenterArc((FILLET5_R, -FILLET5_R), FILLET5_R, 90, 90)
            Line((0, -FILLET5_R), (0, 0))
            Line((0, 0), (FILLET5_R, 0))
        make_face()
    fillet5_piece_4 = extrude(amount=9.65, mode=Mode.PRIVATE)
    fillet5_piece_4 = fillet5_piece_4 - Plane(origin=(1122.579927858, 511.9156047, 1094.447824598), x_dir=(0, 1, 0), z_dir=(0, 0, -1)) * Cylinder(1.6, 28, mode=Mode.PRIVATE)
    add(fillet5_piece_4)
    # the kernel refuses this fillet: 2 mm, written as the material it takes off along each edge
    with BuildSketch(Plane(origin=(1133.829927858, 518.1656047, 1094.883697074), x_dir=(0, -1, 0), z_dir=(-1, 0, 0))) as fillet5_2_piece_1:
        with BuildLine():
            CenterArc((FILLET5_R, FILLET5_R), FILLET5_R, 180, 90)
            Line((0, FILLET5_R), (0, 0))
            Line((0, 0), (FILLET5_R, 0))
        make_face()
    extrude(amount=22.5, mode=Mode.SUBTRACT)
    with BuildSketch(Plane(origin=(1166.329927858, 518.1656047, 1094.883697074), x_dir=(0, 0, 1), z_dir=(-1, 0, 0))) as fillet5_2_piece_2:
        with BuildLine():
            CenterArc((FILLET5_R, -FILLET5_R), FILLET5_R, 90, 90)
            Line((0, -FILLET5_R), (0, 0))
            Line((0, 0), (FILLET5_R, 0))
        make_face()
    extrude(amount=22.5, mode=Mode.SUBTRACT)

    # Sketch18 → Cut-Extrude5 (cut)
    with BuildSketch(Plane(origin=(0, 0, 1091.883697074), x_dir=(-1, 0, 0), z_dir=(0, 0, -1))):
        with Locations(Location((-1155.079927858, 511.9156047, 0), (0, 0, 90))):
            Circle(SKETCH18_R)
        with Locations(Location((-1122.579927858, 511.9156047, 0), (0, 0, 90))):
            Circle(SKETCH18_R)
    extrude(amount=-CUT_EXTRUDE5_DEPTH, mode=Mode.SUBTRACT)

    # Fillet8
    fillet8_edges = [part_1.edges().sort_by_distance(p)[0] for p in [
        (1138.829927858, 505.6656047, 1119.483697074),
    ]]
    fillet(fillet8_edges, radius=FILLET8_R)

    # Sketch24 → Cut-Extrude9 (cut)
    with BuildSketch(Plane(origin=(0, 0, 1091.883697074), x_dir=(-1, 0, 0), z_dir=(0, 0, -1))):
        with Locations(Location((-1138.529927858, 447.326151989, 0), (0, 0, 90))):
            Circle(SKETCH24_R)
    extrude(amount=-CUT_EXTRUDE9_DEPTH, mode=Mode.SUBTRACT)



with BuildPart() as body_2_2:
    # Sketch19 → Boss-Extrude9 (new body)
    with BuildSketch(Plane(origin=(1149.779927858, 0, 0), x_dir=(0, 0, -1), z_dir=(1, 0, 0))):
        with Locations((-1093.383697074, 434.441600027)):
            Rectangle(SKETCH19_W, SKETCH19_H)
    extrude(amount=BOSS_EXTRUDE9_DEPTH)


with BuildPart() as body_3:
    # Sketch20 → Boss-Extrude10 (new body)
    with BuildSketch(Plane(origin=(0, 0, 1091.883697074), x_dir=(-1, 0, 0), z_dir=(0, 0, -1))):
        with Locations((-1154.049927858, 434.441600027)):
            Rectangle(SKETCH20_W, SKETCH20_H)
    extrude(amount=-BOSS_EXTRUDE10_DEPTH)


with BuildPart() as body_4:
    # Sketch21 → Boss-Extrude12 (new body)
    with BuildSketch(Plane(origin=(1157.049927858, 0, 0), x_dir=(0, 0, -1), z_dir=(1, 0, 0))):
        with Locations((-1099.883697074, 434.441600027)):
            Rectangle(SKETCH21_W, SKETCH21_H)
    extrude(amount=BOSS_EXTRUDE12_DEPTH)

    # Sketch22 → Cut-Extrude6 (cut, through all)
    with BuildSketch(Plane(origin=(0, 0, 1096.883697074), x_dir=(-1, 0, 0), z_dir=(0, 0, -1))):
        with Locations((-1160.049927858, 434.441600027)):
            Circle(SKETCH22_R)
    extrude(amount=-CUT_EXTRUDE6_DEPTH, mode=Mode.SUBTRACT)


with BuildPart() as cut_extrude7_tool:
    # Sketch23 → Cut-Extrude7 (new, two sides: drawn at the far end of the back side and taken through both)
    with BuildSketch(Plane(origin=(0, 0, 1096.883697074), x_dir=(-1, 0, 0), z_dir=(0, 0, -1)).offset(-CUT_EXTRUDE7_DEPTH_BACK)):
        with BuildLine():
            Line((-1151.049927858, 425.266600027), (-1151.049927858, 419.441600027))
            Line((-1151.049927858, 419.441600027), (-1166.049927858, 419.441600027))
            Line((-1166.049927858, 419.441600027), (-1166.049927858, 449.441600027))
            Line((-1166.049927858, 449.441600027), (-1151.049927858, 449.441600027))
            Line((-1151.049927858, 449.441600027), (-1151.049927858, 443.616600027))
            ThreePointArc((-1151.049927858, 443.616600027), (-1163.049927858, 434.441600027), (-1151.049927858, 425.266600027))
        make_face()
    extrude(amount=CUT_EXTRUDE7_DEPTH + CUT_EXTRUDE7_DEPTH_BACK)


with BuildPart() as body_3_1:
    add(body_3.part)

    # Cut-Extrude7: cut by cut_extrude7_tool
    add(cut_extrude7_tool.part, mode=Mode.SUBTRACT)


with BuildPart() as body_4_1:
    add(body_4.part)

    # Cut-Extrude7: cut by cut_extrude7_tool
    add(cut_extrude7_tool.part, mode=Mode.SUBTRACT)

    # Sketch31 → Cut-Extrude16 (cut, through all)
    with BuildSketch(Plane(origin=(1157.049927858, 0, 0), x_dir=(0, 0, -1), z_dir=(1, 0, 0))):
        with Locations((-1098.153697074, 434.441600027)):
            Rectangle(SKETCH31_W, SKETCH31_H)
    extrude(amount=CUT_EXTRUDE16_DEPTH, mode=Mode.SUBTRACT)


with BuildPart() as body_5:
    # Sketch25 → Boss-Extrude13 (new body)
    with BuildSketch(Plane.XY.offset(1094.883697074)):
        with Locations((1138.829927858, 443.616600027)):
            Rectangle(SKETCH25_W, SKETCH25_H)
        with Locations(Location((1139.009861583, 436.459083358, 0), (0, 0, 90))):
            Circle(SKETCH25_R, mode=Mode.SUBTRACT)
        with Locations(Location((1138.529927858, 447.326151989, 0), (0, 0, 90))):
            Circle(SKETCH25_R_2, mode=Mode.SUBTRACT)
    extrude(amount=BOSS_EXTRUDE13_DEPTH)


with BuildPart() as part_2:
    add(part_1.part)

    add(body_5.part)  # Boss-Extrude14 merges body 5
    # Sketch26 → Boss-Extrude14 (add)
    with BuildSketch(Plane.XZ.offset(-425.266600027)):
        with Locations((1138.829927858, 1098.883697074)):
            Rectangle(SKETCH26_W, SKETCH26_H)
    extrude(amount=BOSS_EXTRUDE14_DEPTH)

    # Sketch27 → Boss-Extrude15 (add)
    with BuildSketch(Plane(origin=(1126.609927858, 0, 0), x_dir=(0, 0, -1), z_dir=(1, 0, 0))):
        with Locations((-1098.883697074, 452.791600027)):
            Rectangle(SKETCH27_W, SKETCH27_H)
    extrude(amount=BOSS_EXTRUDE15_DEPTH)

    # Sketch32 → Cut-Extrude17 (cut, through all)
    with BuildSketch(Plane.ZY.offset(-1120.609927858)):
        with Locations((1095.653697074, 452.791600027)):
            Rectangle(SKETCH32_W, SKETCH32_H)
    extrude(amount=CUT_EXTRUDE17_DEPTH, mode=Mode.SUBTRACT)


with BuildPart() as body_5_2:
    # Sketch28 → Boss-Extrude17 (new body)
    with BuildSketch(Plane.ZY.offset(-1151.049927858)):
        with Locations((1098.883697074, 434.441600027)):
            Rectangle(SKETCH28_W, SKETCH28_H)
    extrude(amount=BOSS_EXTRUDE17_DEPTH)


solid = Compound([body_2_2.part, body_3_1.part, body_4_1.part, part_2.part, body_5_2.part])
